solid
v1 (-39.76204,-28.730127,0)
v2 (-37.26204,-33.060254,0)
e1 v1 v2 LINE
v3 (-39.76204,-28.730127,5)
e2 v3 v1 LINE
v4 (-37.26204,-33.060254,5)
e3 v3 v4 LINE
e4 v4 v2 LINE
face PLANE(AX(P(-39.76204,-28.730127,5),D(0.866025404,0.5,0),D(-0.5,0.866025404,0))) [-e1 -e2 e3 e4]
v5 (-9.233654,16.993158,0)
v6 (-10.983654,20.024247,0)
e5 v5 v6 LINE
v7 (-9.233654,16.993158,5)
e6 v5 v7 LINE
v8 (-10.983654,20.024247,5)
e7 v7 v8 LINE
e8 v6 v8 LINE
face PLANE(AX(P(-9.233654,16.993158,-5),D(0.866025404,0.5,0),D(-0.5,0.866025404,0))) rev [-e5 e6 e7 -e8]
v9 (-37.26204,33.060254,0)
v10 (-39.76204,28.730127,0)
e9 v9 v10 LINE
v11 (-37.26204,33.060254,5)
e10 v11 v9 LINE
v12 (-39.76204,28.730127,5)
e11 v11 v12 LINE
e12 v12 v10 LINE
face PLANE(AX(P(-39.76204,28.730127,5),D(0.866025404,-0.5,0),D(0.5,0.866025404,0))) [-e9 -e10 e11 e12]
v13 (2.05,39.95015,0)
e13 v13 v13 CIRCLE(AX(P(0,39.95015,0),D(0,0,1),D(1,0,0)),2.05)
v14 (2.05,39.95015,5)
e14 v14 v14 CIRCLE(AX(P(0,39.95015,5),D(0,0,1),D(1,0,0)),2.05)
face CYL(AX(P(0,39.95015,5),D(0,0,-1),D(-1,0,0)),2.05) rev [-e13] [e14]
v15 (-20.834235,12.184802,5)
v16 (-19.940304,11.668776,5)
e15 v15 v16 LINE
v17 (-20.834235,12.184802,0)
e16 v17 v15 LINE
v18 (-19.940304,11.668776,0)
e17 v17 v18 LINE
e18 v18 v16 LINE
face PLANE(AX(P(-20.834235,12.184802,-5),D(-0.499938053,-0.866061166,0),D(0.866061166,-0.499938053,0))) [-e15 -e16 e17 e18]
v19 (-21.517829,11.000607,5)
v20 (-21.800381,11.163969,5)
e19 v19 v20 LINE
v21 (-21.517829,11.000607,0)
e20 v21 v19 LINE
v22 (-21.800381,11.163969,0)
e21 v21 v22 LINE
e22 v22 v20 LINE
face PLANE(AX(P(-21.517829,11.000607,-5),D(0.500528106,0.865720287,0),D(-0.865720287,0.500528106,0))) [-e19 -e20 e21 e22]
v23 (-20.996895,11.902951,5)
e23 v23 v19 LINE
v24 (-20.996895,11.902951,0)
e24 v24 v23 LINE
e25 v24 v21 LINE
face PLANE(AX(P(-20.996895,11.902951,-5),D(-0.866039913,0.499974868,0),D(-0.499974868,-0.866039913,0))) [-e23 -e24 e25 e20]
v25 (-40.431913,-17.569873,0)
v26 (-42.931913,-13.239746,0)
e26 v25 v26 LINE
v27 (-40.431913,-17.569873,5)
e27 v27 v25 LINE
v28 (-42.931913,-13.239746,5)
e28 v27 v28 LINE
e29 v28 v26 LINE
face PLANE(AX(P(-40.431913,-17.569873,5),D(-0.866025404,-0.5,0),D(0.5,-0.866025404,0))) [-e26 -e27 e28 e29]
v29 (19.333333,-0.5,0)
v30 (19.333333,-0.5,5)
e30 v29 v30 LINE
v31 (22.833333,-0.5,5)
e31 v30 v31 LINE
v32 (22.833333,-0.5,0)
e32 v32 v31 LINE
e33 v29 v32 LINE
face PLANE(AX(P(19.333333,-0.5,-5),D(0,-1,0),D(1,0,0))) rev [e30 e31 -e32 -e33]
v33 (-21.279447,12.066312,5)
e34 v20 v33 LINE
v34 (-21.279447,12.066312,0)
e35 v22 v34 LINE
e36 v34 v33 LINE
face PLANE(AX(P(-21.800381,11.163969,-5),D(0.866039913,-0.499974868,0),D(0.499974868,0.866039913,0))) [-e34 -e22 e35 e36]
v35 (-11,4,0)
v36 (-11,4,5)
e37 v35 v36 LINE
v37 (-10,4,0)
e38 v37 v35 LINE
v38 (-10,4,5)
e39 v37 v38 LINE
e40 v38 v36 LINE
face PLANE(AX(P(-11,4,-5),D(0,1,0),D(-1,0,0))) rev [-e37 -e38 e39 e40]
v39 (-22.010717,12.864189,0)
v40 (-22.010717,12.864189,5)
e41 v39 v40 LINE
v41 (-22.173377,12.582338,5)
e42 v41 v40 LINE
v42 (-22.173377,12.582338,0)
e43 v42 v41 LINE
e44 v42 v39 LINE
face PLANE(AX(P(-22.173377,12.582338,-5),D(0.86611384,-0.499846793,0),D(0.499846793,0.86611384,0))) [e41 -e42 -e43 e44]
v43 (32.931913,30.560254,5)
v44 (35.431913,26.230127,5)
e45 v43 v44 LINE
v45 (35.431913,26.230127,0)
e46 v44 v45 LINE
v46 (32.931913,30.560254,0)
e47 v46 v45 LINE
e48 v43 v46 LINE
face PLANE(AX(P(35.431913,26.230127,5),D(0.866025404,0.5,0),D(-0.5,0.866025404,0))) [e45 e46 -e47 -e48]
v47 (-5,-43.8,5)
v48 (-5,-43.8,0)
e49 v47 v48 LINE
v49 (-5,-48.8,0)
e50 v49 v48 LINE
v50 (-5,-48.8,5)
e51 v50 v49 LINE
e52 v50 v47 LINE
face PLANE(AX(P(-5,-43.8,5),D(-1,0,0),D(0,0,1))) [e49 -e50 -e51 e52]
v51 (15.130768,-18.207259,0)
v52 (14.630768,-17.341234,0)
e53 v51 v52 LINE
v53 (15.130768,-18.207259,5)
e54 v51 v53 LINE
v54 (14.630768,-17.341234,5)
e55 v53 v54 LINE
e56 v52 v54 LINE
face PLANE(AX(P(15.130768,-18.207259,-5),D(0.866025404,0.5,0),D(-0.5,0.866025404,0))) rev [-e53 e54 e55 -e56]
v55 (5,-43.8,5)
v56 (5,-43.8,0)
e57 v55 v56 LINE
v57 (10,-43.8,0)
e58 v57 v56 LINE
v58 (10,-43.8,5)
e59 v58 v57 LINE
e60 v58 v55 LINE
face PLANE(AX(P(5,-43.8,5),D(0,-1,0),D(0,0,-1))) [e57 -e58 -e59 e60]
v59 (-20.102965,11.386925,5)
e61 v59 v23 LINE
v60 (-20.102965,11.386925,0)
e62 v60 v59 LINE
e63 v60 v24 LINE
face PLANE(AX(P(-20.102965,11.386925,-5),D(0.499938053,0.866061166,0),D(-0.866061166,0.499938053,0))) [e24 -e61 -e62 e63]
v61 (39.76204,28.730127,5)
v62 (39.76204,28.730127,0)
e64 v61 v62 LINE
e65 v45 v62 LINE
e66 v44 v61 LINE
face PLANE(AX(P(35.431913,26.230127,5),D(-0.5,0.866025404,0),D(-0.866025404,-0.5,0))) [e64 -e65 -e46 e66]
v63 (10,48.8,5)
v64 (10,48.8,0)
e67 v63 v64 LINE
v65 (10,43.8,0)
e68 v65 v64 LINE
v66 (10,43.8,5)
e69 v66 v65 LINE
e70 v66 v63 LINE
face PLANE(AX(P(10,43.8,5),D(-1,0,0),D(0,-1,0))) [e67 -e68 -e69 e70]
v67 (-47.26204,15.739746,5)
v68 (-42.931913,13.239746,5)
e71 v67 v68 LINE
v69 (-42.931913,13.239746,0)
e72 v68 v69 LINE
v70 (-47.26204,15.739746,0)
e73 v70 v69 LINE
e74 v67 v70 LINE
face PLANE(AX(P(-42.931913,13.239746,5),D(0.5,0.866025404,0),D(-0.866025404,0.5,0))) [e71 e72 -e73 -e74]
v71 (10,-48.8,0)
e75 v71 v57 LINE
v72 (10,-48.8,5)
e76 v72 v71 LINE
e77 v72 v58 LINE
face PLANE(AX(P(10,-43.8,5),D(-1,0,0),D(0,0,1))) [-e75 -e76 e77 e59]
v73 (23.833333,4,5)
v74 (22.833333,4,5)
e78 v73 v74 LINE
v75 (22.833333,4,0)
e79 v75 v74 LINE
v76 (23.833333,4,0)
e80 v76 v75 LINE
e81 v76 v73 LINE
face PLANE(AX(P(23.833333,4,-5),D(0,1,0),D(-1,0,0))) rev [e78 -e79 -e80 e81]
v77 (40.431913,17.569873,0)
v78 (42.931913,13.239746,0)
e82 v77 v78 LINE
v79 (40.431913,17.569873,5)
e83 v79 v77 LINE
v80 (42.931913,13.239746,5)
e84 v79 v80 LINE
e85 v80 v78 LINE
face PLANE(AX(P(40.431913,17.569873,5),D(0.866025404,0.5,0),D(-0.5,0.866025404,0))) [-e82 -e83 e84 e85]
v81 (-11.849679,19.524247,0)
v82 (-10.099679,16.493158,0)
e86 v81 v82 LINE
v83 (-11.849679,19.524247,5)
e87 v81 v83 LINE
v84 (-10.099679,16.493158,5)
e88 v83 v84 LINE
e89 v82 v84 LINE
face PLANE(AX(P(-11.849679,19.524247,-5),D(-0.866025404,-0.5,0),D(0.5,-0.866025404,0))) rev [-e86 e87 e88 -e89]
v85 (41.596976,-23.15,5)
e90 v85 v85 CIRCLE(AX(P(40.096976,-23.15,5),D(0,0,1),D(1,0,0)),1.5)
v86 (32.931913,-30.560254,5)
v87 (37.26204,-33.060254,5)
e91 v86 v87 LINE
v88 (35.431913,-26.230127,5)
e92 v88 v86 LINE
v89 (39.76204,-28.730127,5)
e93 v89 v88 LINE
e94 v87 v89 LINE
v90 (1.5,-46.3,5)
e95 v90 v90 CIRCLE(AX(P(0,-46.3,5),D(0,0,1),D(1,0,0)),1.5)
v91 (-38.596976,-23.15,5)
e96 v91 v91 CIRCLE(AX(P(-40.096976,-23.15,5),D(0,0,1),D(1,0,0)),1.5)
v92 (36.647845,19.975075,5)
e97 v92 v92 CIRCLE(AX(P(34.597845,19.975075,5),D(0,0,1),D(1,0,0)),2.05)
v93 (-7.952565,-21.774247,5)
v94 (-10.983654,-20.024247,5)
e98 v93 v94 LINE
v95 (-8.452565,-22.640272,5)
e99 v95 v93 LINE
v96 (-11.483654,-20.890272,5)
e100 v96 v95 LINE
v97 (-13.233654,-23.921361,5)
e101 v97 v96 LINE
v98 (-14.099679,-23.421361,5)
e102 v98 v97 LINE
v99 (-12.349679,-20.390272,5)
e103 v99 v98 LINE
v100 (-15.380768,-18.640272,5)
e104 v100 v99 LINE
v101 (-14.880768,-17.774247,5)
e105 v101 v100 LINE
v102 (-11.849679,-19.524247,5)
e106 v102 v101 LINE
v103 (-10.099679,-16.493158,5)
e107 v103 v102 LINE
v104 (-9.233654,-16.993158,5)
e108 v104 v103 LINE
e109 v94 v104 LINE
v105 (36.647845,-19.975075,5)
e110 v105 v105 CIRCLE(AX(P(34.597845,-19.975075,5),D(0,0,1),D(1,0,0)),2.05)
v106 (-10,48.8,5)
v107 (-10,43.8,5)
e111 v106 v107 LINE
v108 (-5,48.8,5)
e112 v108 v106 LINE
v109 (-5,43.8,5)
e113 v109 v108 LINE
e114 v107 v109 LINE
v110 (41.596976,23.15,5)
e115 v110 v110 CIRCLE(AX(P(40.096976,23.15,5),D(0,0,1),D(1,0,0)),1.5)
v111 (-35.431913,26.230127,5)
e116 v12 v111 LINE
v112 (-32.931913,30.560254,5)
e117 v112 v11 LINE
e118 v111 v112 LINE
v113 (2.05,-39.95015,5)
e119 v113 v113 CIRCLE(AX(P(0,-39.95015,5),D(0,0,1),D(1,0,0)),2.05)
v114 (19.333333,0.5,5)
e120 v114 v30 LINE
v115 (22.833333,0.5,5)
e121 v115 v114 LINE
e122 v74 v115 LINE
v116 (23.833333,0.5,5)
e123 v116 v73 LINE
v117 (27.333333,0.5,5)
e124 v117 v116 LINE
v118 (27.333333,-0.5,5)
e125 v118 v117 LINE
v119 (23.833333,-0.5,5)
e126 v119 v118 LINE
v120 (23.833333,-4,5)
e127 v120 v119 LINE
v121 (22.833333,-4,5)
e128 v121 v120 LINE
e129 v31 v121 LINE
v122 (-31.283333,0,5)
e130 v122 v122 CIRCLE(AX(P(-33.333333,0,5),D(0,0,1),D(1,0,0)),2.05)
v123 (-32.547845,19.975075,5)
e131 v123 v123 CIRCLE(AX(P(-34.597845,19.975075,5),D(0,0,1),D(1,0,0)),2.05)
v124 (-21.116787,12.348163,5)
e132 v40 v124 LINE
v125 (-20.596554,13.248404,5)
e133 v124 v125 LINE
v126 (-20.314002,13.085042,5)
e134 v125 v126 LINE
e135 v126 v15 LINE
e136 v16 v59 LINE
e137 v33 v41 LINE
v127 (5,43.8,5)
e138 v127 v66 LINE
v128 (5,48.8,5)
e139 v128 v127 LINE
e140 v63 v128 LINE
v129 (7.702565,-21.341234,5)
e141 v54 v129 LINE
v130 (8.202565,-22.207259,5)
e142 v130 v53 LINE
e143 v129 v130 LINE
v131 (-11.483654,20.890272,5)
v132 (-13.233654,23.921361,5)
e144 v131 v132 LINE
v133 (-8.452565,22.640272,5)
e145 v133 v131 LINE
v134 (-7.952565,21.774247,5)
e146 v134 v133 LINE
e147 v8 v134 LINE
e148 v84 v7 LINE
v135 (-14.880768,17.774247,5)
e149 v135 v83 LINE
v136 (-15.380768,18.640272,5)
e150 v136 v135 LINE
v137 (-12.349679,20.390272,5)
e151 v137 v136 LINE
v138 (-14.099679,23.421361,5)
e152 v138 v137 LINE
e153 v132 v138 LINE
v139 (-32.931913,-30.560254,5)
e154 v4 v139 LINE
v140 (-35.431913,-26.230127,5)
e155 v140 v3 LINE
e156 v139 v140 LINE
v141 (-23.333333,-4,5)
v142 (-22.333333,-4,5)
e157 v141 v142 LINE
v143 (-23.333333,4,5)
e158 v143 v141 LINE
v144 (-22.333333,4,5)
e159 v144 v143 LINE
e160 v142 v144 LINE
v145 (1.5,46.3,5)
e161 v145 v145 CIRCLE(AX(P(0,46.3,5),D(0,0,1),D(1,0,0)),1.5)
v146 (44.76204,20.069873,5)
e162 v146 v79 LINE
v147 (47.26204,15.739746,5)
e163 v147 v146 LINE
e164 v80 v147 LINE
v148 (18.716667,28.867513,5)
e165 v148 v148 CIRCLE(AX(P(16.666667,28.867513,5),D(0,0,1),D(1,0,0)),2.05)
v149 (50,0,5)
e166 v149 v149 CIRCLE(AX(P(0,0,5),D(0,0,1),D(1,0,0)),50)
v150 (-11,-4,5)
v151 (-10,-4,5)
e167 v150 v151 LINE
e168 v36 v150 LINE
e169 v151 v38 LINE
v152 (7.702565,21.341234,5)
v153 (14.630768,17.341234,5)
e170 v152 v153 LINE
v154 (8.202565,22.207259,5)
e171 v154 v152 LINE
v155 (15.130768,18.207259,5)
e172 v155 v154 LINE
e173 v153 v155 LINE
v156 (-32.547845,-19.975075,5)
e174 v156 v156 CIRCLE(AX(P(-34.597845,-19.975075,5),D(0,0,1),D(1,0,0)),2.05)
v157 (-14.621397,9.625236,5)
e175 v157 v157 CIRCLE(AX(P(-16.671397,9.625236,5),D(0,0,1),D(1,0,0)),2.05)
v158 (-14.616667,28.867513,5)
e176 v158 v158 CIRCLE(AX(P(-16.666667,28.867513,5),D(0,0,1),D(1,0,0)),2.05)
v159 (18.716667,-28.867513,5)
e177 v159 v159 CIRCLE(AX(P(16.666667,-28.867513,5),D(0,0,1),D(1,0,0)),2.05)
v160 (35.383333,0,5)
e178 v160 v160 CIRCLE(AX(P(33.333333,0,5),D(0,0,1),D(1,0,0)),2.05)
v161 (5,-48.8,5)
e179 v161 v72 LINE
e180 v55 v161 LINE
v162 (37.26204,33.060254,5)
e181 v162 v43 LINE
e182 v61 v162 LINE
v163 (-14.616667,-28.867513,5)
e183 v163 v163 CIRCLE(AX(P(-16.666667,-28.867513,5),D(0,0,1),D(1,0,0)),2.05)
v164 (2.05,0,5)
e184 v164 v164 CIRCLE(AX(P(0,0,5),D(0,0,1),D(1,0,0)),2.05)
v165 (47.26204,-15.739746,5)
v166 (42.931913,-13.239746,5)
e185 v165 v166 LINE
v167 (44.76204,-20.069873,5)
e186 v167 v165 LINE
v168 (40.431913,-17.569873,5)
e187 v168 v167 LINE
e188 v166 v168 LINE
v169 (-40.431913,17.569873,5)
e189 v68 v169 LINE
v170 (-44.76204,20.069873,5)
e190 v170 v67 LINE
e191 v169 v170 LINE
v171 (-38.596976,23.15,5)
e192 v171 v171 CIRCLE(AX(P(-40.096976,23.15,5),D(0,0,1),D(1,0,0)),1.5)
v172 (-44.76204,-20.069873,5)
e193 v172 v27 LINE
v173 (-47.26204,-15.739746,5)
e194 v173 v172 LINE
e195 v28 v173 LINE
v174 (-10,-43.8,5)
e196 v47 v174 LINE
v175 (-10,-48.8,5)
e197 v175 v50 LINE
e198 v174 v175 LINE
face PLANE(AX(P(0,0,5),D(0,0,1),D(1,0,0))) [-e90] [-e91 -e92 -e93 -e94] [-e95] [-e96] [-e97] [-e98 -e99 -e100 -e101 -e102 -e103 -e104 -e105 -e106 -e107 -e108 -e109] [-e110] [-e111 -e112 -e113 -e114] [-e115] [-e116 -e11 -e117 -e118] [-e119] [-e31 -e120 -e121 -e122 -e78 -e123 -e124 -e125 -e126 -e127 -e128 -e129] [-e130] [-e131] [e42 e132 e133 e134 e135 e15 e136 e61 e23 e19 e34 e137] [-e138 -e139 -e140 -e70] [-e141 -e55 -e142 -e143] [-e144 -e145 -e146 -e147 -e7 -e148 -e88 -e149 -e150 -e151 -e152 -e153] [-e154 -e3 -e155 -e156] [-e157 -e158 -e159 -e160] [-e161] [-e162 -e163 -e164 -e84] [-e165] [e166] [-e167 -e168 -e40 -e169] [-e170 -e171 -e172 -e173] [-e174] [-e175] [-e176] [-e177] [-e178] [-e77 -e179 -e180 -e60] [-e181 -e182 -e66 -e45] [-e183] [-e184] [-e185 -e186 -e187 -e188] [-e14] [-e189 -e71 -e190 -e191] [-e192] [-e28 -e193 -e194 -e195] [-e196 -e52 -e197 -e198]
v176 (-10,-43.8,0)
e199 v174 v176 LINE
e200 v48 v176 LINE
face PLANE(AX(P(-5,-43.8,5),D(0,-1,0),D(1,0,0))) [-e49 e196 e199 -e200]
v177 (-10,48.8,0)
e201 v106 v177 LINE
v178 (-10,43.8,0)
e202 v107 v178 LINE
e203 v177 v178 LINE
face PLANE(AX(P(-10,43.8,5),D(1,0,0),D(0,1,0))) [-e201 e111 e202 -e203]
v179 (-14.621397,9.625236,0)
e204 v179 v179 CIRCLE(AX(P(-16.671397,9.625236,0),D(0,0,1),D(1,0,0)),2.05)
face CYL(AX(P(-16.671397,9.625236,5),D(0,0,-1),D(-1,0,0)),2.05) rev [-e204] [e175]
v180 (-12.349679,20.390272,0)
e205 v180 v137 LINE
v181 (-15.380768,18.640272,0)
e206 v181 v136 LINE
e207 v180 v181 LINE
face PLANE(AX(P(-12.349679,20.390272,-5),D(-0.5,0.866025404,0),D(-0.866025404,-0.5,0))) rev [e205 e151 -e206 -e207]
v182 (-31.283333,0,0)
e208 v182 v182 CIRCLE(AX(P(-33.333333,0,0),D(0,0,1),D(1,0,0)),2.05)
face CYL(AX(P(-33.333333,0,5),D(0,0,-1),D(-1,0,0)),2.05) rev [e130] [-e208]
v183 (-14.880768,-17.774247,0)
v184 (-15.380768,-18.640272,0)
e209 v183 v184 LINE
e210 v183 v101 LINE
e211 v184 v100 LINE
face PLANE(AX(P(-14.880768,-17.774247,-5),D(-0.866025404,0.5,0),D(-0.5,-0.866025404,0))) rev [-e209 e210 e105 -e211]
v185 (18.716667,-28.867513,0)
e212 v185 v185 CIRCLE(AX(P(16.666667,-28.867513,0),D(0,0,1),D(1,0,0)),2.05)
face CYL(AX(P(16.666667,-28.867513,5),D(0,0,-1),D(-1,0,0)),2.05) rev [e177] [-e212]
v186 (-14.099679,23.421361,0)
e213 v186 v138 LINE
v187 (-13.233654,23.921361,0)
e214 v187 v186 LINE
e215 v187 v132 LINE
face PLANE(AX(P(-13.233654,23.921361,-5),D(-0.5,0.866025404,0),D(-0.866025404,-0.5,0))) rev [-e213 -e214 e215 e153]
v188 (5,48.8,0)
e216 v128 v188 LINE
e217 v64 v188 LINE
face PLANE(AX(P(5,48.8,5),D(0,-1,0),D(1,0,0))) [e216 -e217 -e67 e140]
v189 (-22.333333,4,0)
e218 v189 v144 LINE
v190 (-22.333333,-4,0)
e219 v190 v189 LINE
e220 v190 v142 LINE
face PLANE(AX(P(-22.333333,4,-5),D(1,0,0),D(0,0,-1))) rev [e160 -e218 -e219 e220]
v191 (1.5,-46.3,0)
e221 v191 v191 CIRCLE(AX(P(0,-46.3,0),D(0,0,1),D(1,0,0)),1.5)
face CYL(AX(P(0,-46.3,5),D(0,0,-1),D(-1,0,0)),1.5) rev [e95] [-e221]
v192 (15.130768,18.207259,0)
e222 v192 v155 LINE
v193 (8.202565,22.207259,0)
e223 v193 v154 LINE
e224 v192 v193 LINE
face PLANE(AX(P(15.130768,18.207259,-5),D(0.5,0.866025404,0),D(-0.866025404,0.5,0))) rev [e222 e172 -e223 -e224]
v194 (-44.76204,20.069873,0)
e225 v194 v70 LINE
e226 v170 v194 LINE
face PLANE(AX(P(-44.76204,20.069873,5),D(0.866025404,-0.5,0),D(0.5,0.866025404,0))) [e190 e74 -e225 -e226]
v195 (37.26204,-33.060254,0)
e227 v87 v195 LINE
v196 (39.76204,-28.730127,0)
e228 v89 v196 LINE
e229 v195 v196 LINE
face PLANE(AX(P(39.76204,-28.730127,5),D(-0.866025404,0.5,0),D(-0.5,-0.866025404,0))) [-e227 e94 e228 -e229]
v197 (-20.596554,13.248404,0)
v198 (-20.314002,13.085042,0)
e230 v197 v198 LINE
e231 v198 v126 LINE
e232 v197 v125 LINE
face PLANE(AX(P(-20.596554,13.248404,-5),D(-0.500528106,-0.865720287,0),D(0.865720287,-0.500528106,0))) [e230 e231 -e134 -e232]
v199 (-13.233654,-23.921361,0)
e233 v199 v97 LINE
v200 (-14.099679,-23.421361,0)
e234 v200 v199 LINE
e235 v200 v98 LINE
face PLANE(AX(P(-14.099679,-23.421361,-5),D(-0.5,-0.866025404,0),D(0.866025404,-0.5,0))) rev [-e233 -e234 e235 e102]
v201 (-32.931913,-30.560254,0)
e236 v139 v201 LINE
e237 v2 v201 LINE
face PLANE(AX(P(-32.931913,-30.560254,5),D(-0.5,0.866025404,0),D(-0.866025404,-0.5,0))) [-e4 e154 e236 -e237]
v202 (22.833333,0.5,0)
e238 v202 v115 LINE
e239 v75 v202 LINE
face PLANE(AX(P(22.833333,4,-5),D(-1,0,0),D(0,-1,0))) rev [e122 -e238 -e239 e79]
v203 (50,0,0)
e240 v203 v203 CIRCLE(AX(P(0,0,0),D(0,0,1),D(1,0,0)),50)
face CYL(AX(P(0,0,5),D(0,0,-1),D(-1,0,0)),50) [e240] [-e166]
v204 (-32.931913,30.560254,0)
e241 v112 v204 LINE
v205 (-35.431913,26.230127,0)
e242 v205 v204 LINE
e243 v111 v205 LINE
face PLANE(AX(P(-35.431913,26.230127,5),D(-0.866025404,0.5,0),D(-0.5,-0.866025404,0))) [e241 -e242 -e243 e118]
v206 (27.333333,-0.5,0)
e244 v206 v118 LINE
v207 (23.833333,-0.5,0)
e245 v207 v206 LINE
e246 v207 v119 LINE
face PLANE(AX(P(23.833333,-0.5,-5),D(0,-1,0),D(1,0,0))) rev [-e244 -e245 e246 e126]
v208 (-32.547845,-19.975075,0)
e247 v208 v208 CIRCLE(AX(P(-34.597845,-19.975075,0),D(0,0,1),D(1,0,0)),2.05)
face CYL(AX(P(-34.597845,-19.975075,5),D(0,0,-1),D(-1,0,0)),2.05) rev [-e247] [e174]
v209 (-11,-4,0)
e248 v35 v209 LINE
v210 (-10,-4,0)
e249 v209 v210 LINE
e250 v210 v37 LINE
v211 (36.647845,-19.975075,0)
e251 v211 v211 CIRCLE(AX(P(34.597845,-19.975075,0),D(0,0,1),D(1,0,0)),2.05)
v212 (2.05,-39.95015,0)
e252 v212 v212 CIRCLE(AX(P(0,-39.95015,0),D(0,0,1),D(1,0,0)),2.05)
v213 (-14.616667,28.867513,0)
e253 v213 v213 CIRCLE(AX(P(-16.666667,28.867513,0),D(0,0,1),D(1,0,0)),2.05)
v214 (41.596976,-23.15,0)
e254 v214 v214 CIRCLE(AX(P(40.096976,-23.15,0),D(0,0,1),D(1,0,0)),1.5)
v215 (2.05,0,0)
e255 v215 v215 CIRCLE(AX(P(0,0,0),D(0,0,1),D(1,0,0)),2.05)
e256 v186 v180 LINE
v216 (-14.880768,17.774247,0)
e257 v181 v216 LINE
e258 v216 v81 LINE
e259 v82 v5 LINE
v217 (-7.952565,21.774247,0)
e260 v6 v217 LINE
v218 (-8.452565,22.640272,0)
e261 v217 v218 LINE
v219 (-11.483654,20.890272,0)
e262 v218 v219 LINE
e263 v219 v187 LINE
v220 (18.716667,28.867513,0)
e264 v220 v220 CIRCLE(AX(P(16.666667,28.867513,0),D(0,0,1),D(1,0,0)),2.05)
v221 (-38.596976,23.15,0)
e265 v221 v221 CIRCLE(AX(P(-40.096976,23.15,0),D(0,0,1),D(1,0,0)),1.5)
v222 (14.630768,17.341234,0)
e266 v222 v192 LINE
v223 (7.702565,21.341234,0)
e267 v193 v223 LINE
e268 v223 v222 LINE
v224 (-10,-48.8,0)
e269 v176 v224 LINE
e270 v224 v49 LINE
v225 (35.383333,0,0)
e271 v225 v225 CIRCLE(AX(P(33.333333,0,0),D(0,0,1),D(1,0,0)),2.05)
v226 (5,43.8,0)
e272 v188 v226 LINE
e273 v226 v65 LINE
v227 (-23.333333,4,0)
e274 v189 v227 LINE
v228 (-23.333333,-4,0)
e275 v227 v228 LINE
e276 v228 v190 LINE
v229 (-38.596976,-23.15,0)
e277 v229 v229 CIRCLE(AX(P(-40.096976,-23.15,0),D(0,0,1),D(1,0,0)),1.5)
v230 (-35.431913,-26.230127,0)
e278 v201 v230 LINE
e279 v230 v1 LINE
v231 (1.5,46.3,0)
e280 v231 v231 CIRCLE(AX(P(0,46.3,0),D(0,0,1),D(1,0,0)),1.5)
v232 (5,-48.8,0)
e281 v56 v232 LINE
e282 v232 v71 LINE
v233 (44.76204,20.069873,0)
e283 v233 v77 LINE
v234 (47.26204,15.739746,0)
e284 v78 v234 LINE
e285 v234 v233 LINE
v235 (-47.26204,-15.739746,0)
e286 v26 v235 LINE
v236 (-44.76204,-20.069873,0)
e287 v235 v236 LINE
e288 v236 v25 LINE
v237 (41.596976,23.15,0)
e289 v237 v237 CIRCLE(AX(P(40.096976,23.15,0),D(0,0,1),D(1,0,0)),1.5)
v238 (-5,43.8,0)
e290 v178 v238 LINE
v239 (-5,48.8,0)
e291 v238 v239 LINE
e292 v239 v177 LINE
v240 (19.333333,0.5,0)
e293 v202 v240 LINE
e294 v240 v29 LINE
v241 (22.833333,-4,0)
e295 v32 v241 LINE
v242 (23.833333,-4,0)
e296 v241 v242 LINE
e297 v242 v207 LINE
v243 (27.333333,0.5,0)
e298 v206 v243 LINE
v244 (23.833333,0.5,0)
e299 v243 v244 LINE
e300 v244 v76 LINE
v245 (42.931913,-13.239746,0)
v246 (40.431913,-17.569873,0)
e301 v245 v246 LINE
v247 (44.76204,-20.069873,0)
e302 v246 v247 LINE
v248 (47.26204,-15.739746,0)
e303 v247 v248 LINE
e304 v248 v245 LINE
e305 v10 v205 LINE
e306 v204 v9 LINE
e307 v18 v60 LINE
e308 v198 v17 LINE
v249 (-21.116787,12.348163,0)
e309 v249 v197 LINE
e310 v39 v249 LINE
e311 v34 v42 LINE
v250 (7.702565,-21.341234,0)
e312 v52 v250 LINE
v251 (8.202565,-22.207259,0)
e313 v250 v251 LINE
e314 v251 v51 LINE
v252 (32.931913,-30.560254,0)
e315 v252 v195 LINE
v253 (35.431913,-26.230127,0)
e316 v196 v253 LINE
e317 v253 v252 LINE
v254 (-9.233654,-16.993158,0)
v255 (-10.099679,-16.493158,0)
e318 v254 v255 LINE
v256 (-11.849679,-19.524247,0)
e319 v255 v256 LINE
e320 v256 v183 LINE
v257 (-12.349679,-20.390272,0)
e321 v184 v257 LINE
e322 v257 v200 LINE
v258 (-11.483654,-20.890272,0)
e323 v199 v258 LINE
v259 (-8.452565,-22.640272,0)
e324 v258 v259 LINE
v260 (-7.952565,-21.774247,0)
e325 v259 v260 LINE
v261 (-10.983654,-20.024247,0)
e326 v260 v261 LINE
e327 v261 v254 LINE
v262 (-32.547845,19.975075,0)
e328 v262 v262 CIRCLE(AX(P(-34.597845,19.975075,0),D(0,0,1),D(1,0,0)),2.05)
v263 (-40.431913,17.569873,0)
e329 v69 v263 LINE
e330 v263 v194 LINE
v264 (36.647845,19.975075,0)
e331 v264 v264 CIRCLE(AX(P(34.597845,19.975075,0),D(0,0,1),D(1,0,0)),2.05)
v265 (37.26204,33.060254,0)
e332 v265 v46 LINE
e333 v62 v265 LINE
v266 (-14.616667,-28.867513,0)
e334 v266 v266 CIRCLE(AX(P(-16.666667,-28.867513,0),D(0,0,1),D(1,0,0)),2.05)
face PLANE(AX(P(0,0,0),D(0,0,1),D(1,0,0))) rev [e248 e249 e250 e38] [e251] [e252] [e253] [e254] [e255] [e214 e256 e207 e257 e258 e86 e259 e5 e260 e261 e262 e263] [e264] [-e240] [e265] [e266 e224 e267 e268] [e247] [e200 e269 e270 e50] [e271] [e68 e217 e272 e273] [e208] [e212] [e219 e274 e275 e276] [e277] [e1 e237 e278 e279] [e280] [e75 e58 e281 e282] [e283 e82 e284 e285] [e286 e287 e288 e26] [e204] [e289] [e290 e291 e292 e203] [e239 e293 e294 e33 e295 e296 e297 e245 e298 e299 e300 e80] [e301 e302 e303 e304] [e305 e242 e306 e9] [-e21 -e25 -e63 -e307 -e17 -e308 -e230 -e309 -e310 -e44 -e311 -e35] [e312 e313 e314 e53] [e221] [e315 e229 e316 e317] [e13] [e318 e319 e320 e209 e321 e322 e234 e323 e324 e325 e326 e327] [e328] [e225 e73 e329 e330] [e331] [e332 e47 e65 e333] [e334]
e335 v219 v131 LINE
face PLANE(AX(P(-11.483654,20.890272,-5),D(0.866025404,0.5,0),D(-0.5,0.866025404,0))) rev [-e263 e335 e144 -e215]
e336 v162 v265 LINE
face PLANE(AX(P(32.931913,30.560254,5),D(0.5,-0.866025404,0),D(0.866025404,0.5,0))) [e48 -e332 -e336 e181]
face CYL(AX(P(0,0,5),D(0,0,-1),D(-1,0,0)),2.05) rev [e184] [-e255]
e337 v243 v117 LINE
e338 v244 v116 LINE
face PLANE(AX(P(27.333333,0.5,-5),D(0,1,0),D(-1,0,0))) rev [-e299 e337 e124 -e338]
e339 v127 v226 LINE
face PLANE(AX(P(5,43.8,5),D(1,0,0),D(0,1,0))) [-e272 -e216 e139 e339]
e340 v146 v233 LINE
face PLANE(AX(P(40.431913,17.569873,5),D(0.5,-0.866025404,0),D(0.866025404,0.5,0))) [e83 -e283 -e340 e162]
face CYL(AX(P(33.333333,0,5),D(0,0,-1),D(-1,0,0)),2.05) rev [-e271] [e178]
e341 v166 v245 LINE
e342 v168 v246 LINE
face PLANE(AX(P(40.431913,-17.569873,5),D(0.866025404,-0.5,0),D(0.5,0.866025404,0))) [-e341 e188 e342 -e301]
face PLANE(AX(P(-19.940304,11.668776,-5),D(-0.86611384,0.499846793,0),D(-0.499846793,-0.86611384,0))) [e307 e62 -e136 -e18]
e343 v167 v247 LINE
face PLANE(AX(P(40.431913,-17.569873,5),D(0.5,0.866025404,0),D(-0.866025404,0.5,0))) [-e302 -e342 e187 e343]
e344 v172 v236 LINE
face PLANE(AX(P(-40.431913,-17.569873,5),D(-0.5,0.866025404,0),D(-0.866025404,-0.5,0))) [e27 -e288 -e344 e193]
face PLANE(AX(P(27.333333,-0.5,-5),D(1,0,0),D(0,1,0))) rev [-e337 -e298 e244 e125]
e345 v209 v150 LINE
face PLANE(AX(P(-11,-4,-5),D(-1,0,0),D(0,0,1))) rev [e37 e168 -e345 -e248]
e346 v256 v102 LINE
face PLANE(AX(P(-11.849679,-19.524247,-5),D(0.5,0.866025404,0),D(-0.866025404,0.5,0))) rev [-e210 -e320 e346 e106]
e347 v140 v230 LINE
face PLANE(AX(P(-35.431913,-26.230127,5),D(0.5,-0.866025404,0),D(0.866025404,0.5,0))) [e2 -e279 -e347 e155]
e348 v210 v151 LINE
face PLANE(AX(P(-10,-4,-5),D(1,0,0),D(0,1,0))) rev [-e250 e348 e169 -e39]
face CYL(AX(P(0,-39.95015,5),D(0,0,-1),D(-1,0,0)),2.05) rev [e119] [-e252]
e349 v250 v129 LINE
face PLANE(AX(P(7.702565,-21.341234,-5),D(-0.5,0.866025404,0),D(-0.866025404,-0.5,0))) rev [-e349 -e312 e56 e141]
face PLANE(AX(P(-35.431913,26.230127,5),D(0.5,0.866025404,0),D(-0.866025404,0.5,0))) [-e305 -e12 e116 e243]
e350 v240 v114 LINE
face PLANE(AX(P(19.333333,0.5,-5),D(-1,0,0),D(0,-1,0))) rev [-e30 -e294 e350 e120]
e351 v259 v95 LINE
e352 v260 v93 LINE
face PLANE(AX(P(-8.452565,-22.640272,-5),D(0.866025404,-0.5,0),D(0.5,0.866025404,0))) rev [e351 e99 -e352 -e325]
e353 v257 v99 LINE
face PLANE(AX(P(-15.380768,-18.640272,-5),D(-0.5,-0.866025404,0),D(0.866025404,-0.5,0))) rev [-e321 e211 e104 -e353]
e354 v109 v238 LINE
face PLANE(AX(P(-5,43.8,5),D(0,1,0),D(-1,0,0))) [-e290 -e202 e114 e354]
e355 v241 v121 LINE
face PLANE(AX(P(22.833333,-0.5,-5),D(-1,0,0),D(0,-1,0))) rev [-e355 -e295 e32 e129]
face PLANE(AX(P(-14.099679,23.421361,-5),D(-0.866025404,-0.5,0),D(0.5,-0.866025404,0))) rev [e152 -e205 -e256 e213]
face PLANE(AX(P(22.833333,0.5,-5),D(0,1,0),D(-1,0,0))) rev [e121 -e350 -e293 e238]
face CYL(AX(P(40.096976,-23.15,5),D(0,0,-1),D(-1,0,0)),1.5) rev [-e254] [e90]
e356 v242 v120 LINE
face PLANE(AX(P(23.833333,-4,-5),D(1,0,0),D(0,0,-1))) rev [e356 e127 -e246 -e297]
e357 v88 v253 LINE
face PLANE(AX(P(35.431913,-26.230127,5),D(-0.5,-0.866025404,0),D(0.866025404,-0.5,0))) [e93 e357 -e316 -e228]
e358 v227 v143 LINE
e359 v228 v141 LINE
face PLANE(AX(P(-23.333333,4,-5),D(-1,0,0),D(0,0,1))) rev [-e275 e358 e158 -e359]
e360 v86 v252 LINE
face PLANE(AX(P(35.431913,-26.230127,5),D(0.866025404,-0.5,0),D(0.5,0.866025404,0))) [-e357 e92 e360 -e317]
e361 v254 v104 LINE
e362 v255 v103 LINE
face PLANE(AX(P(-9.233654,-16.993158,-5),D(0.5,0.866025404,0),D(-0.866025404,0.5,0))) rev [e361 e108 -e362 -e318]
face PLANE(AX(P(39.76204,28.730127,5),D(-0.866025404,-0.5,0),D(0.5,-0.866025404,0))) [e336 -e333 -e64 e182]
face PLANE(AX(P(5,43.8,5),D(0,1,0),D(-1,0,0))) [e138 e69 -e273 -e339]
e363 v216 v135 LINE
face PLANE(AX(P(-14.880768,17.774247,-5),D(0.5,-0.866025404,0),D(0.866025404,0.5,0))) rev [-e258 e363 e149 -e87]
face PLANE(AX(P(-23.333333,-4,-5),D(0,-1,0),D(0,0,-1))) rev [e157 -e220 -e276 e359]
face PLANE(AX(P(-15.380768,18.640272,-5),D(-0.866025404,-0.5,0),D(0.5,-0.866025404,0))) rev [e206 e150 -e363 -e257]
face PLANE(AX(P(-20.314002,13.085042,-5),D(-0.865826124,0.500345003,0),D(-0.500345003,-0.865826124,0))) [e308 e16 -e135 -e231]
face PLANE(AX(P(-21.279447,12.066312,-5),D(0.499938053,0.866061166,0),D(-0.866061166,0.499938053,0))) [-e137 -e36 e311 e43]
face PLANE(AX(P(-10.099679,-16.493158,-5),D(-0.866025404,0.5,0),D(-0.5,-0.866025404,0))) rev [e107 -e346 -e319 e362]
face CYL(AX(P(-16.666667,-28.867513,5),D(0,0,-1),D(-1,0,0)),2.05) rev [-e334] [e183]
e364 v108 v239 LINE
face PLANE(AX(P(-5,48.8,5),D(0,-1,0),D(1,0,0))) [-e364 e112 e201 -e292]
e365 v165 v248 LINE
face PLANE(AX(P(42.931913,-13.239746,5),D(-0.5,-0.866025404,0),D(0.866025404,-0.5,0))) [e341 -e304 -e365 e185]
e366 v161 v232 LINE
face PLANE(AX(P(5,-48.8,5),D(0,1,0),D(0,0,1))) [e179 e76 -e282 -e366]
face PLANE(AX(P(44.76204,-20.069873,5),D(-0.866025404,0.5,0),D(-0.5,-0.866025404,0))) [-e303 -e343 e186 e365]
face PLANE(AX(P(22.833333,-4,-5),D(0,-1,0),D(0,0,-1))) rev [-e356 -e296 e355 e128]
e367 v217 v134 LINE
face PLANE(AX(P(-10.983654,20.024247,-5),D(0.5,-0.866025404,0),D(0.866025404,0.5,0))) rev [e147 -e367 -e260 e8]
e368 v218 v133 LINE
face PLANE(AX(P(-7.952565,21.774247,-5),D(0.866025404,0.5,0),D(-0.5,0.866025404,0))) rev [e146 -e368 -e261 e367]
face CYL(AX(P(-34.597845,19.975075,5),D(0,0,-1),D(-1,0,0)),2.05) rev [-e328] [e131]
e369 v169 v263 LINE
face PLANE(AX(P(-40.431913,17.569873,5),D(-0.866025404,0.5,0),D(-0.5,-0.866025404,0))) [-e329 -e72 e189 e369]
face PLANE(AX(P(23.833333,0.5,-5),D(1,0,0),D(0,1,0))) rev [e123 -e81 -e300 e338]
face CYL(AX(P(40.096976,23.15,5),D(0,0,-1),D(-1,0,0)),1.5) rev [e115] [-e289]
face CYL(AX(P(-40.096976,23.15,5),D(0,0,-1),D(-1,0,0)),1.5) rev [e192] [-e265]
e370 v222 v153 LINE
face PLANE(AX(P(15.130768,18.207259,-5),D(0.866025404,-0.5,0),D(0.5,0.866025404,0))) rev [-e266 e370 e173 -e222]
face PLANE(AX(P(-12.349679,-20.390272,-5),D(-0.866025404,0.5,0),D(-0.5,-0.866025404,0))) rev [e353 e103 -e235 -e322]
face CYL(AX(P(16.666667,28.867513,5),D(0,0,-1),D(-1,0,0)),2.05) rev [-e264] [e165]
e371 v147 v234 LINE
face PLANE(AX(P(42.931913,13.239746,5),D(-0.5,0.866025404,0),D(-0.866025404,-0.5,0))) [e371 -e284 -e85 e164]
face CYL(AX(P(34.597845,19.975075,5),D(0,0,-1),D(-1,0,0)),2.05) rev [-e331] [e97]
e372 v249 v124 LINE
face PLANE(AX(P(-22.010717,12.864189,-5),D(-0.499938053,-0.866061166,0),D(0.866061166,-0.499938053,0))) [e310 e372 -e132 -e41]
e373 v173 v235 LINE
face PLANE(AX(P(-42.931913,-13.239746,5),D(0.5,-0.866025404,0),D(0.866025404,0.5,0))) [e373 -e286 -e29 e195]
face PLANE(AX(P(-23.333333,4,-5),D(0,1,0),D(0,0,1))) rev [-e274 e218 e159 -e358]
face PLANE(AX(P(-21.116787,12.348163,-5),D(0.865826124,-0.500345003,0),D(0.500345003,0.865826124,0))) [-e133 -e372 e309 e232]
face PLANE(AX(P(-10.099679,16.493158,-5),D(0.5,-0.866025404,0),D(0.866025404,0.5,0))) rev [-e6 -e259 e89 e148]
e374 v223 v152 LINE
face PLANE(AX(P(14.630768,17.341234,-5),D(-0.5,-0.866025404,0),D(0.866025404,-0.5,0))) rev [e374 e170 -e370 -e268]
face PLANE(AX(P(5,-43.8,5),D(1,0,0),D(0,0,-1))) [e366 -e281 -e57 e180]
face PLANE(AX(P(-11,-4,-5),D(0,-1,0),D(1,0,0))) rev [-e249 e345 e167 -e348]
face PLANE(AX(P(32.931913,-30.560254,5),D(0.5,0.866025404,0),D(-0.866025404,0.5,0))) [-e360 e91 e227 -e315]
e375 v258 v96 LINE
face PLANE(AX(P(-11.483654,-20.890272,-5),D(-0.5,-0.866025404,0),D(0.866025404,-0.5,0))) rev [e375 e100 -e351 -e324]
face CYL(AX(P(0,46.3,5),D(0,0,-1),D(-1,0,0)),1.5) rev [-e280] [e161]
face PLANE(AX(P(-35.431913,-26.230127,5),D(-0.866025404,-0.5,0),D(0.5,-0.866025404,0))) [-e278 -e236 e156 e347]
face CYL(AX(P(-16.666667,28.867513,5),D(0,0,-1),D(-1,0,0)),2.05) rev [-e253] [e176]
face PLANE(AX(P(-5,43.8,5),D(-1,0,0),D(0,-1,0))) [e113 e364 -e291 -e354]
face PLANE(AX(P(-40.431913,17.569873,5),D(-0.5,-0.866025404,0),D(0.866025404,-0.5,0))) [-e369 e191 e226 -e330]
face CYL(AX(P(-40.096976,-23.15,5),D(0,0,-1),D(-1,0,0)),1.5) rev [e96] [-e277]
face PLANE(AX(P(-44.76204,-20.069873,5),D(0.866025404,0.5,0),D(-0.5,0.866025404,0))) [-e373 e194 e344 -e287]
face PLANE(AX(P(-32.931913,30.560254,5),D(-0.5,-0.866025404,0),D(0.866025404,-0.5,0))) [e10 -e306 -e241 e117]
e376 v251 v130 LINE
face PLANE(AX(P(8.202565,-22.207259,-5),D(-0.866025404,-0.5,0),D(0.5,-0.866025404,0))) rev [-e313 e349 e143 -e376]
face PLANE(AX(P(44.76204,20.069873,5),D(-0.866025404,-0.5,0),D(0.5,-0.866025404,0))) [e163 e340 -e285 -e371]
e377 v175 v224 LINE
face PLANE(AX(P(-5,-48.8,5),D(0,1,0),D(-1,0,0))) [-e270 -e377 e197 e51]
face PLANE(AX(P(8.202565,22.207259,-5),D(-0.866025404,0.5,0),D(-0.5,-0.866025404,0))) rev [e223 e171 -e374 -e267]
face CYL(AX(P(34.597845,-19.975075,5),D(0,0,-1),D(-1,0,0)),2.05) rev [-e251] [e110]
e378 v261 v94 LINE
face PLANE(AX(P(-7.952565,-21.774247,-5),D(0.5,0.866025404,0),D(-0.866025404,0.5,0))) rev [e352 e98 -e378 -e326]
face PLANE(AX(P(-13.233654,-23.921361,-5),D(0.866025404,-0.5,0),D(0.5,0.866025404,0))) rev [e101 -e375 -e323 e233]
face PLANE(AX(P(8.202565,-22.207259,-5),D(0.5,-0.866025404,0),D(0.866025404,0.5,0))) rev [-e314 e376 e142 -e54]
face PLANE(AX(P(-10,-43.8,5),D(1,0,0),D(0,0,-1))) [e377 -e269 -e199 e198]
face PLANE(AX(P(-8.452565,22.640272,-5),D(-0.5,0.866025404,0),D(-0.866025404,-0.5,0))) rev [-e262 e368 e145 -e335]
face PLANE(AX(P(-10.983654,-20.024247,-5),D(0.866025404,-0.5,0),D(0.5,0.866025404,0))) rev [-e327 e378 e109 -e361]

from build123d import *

# Parameters (mm, degrees)
BOSS_EXTRU_1_OUTLINE_R   = 50
BOSS_EXTRU_1_OUTLINE_W   = 5
BOSS_EXTRU_1_OUTLINE_H   = 5
BOSS_EXTRU_1_OUTLINE_R_2 = 2.05
BOSS_EXTRU_1_OUTLINE_R_3 = 1.5
BOSS_EXTRU_1_DEPTH       = 5
SKETCH3_W                = 1
SKETCH3_H                = 8
CUT_EXTRUDE2_DEPTH       = 10


# Read off the part's stored shape, not the designer's step: Boss.-Extru.1
with BuildPart() as part:
    # Boss.-Extru.1 outline → Boss.-Extru.1 (new body)
    with BuildSketch(Plane.XY):
        Circle(BOSS_EXTRU_1_OUTLINE_R)
        Polygon((-37.262039705, -33.060254038), (-39.762039705, -28.730127019), (-35.431912686, -26.230127019), (-32.931912686, -30.560254038), align=None, mode=Mode.SUBTRACT)
        with Locations((-7.5, -46.3)):
            Rectangle(BOSS_EXTRU_1_OUTLINE_W, BOSS_EXTRU_1_OUTLINE_H, mode=Mode.SUBTRACT)
        with Locations((-16.666666667, -28.867513459)):
            Circle(BOSS_EXTRU_1_OUTLINE_R_2, mode=Mode.SUBTRACT)
        with Locations((-40.096976195, -23.15)):
            Circle(BOSS_EXTRU_1_OUTLINE_R_3, mode=Mode.SUBTRACT)
        Polygon((-42.931912686, -13.239745962), (-40.431912686, -17.569872981), (-44.762039705, -20.069872981), (-47.262039705, -15.739745962), align=None, mode=Mode.SUBTRACT)
        with Locations((-34.597845014, -19.975075132)):
            Circle(BOSS_EXTRU_1_OUTLINE_R_2, mode=Mode.SUBTRACT)
        with Locations((0, -46.3)):
            Circle(BOSS_EXTRU_1_OUTLINE_R_3, mode=Mode.SUBTRACT)
        with Locations((7.5, -46.3)):
            Rectangle(BOSS_EXTRU_1_OUTLINE_W, BOSS_EXTRU_1_OUTLINE_H, mode=Mode.SUBTRACT)
        with Locations((0, -39.950150265)):
            Circle(BOSS_EXTRU_1_OUTLINE_R_2, mode=Mode.SUBTRACT)
        with Locations((16.666666667, -28.867513459)):
            Circle(BOSS_EXTRU_1_OUTLINE_R_2, mode=Mode.SUBTRACT)
        Polygon((32.931912686, -30.560254038), (35.431912686, -26.230127019), (39.762039705, -28.730127019), (37.262039705, -33.060254038), align=None, mode=Mode.SUBTRACT)
        with Locations((34.597845014, -19.975075132)):
            Circle(BOSS_EXTRU_1_OUTLINE_R_2, mode=Mode.SUBTRACT)
        with Locations((40.096976195, -23.15)):
            Circle(BOSS_EXTRU_1_OUTLINE_R_3, mode=Mode.SUBTRACT)
        Polygon((47.262039705, -15.739745962), (44.762039705, -20.069872981), (40.431912686, -17.569872981), (42.931912686, -13.239745962), align=None, mode=Mode.SUBTRACT)
        with Locations((-33.333333333, 0)):
            Circle(BOSS_EXTRU_1_OUTLINE_R_2, mode=Mode.SUBTRACT)
        Polygon((-47.262039705, 15.739745962), (-44.762039705, 20.069872981), (-40.431912686, 17.569872981), (-42.931912686, 13.239745962), align=None, mode=Mode.SUBTRACT)
        with Locations((-40.096976195, 23.15)):
            Circle(BOSS_EXTRU_1_OUTLINE_R_3, mode=Mode.SUBTRACT)
        with Locations((-34.597845014, 19.975075132)):
            Circle(BOSS_EXTRU_1_OUTLINE_R_2, mode=Mode.SUBTRACT)
        with Locations((-16.671397032, 9.625235564)):
            Circle(BOSS_EXTRU_1_OUTLINE_R_2, mode=Mode.SUBTRACT)
        Polygon((-32.931912686, 30.560254038), (-35.431912686, 26.230127019), (-39.762039705, 28.730127019), (-37.262039705, 33.060254038), align=None, mode=Mode.SUBTRACT)
        with Locations((-16.666666667, 28.867513459)):
            Circle(BOSS_EXTRU_1_OUTLINE_R_2, mode=Mode.SUBTRACT)
        with Locations((-7.5, 46.3)):
            Rectangle(BOSS_EXTRU_1_OUTLINE_W, BOSS_EXTRU_1_OUTLINE_H, mode=Mode.SUBTRACT)
        Circle(BOSS_EXTRU_1_OUTLINE_R_2, mode=Mode.SUBTRACT)
        with Locations((33.333333333, 0)):
            Circle(BOSS_EXTRU_1_OUTLINE_R_2, mode=Mode.SUBTRACT)
        with Locations((34.597845014, 19.975075133)):
            Circle(BOSS_EXTRU_1_OUTLINE_R_2, mode=Mode.SUBTRACT)
        Polygon((42.931912686, 13.239745962), (40.431912686, 17.569872981), (44.762039705, 20.069872981), (47.262039705, 15.739745962), align=None, mode=Mode.SUBTRACT)
        with Locations((40.096976195, 23.15)):
            Circle(BOSS_EXTRU_1_OUTLINE_R_3, mode=Mode.SUBTRACT)
        with Locations((16.666666667, 28.867513459)):
            Circle(BOSS_EXTRU_1_OUTLINE_R_2, mode=Mode.SUBTRACT)
        with Locations((0, 39.950150265)):
            Circle(BOSS_EXTRU_1_OUTLINE_R_2, mode=Mode.SUBTRACT)
        with Locations((0, 46.3)):
            Circle(BOSS_EXTRU_1_OUTLINE_R_3, mode=Mode.SUBTRACT)
        with Locations((7.5, 46.3)):
            Rectangle(BOSS_EXTRU_1_OUTLINE_W, BOSS_EXTRU_1_OUTLINE_H, mode=Mode.SUBTRACT)
        Polygon((37.262039705, 33.060254038), (39.762039705, 28.730127019), (35.431912686, 26.230127019), (32.931912686, 30.560254038), align=None, mode=Mode.SUBTRACT)
    extrude(amount=BOSS_EXTRU_1_DEPTH)

    # Sketch3 → Cut-Extrude2 (cut)
    with BuildSketch(Plane.XY.offset(5)):
        with Locations((-10.5, 0)):
            Rectangle(SKETCH3_W, SKETCH3_H)
        with Locations((-22.833333333, 0)):
            Rectangle(SKETCH3_W, SKETCH3_H)
        Polygon((-13.233653965, 23.921361037), (-14.099679369, 23.421361037), (-12.349679369, 20.390272124), (-15.380768282, 18.640272124), (-14.880768282, 17.77424672), (-11.849679369, 19.52424672), (-10.099679369, 16.493157806), (-9.233653965, 16.993157806), (-10.983653965, 20.02424672), (-7.952565052, 21.77424672), (-8.452565052, 22.640272124), (-11.483653965, 20.890272124), align=None)
        Polygon((15.130768282, 18.207259422), (14.630768282, 17.341234018), (7.702565052, 21.341234018), (8.202565052, 22.207259422), align=None)
        Polygon((8.202565052, -22.207259422), (7.702565052, -21.341234018), (14.630768282, -17.341234018), (15.130768282, -18.207259422), align=None)
        Polygon((27.333333333, -0.5), (27.333333333, 0.5), (23.833333333, 0.5), (23.833333333, 4), (22.833333333, 4), (22.833333333, 0.5), (19.333333333, 0.5), (19.333333333, -0.5), (22.833333333, -0.5), (22.833333333, -4), (23.833333333, -4), (23.833333333, -0.5), align=None)
        Polygon((-14.099679369, -23.421361037), (-13.233653965, -23.921361037), (-11.483653965, -20.890272124), (-8.452565052, -22.640272124), (-7.952565052, -21.77424672), (-10.983653965, -20.02424672), (-9.233653965, -16.993157806), (-10.099679369, -16.493157806), (-11.849679369, -19.52424672), (-14.880768282, -17.77424672), (-15.380768282, -18.640272124), (-12.349679369, -20.390272124), align=None)
        Polygon((-20.834234776, 12.184801987), (-19.940304487, 11.668776346), (-20.102964744, 11.386925384), (-20.996895032, 11.902951025), (-21.517828526, 11.000607275), (-21.800380609, 11.163968654), (-21.279447115, 12.066312404), (-22.173377404, 12.582338045), (-22.010717147, 12.864189006), (-21.116786859, 12.348163365), (-20.596554487, 13.24840375), (-20.314002404, 13.085042371), align=None)
    extrude(amount=-CUT_EXTRUDE2_DEPTH, mode=Mode.SUBTRACT)


solid = part.part
